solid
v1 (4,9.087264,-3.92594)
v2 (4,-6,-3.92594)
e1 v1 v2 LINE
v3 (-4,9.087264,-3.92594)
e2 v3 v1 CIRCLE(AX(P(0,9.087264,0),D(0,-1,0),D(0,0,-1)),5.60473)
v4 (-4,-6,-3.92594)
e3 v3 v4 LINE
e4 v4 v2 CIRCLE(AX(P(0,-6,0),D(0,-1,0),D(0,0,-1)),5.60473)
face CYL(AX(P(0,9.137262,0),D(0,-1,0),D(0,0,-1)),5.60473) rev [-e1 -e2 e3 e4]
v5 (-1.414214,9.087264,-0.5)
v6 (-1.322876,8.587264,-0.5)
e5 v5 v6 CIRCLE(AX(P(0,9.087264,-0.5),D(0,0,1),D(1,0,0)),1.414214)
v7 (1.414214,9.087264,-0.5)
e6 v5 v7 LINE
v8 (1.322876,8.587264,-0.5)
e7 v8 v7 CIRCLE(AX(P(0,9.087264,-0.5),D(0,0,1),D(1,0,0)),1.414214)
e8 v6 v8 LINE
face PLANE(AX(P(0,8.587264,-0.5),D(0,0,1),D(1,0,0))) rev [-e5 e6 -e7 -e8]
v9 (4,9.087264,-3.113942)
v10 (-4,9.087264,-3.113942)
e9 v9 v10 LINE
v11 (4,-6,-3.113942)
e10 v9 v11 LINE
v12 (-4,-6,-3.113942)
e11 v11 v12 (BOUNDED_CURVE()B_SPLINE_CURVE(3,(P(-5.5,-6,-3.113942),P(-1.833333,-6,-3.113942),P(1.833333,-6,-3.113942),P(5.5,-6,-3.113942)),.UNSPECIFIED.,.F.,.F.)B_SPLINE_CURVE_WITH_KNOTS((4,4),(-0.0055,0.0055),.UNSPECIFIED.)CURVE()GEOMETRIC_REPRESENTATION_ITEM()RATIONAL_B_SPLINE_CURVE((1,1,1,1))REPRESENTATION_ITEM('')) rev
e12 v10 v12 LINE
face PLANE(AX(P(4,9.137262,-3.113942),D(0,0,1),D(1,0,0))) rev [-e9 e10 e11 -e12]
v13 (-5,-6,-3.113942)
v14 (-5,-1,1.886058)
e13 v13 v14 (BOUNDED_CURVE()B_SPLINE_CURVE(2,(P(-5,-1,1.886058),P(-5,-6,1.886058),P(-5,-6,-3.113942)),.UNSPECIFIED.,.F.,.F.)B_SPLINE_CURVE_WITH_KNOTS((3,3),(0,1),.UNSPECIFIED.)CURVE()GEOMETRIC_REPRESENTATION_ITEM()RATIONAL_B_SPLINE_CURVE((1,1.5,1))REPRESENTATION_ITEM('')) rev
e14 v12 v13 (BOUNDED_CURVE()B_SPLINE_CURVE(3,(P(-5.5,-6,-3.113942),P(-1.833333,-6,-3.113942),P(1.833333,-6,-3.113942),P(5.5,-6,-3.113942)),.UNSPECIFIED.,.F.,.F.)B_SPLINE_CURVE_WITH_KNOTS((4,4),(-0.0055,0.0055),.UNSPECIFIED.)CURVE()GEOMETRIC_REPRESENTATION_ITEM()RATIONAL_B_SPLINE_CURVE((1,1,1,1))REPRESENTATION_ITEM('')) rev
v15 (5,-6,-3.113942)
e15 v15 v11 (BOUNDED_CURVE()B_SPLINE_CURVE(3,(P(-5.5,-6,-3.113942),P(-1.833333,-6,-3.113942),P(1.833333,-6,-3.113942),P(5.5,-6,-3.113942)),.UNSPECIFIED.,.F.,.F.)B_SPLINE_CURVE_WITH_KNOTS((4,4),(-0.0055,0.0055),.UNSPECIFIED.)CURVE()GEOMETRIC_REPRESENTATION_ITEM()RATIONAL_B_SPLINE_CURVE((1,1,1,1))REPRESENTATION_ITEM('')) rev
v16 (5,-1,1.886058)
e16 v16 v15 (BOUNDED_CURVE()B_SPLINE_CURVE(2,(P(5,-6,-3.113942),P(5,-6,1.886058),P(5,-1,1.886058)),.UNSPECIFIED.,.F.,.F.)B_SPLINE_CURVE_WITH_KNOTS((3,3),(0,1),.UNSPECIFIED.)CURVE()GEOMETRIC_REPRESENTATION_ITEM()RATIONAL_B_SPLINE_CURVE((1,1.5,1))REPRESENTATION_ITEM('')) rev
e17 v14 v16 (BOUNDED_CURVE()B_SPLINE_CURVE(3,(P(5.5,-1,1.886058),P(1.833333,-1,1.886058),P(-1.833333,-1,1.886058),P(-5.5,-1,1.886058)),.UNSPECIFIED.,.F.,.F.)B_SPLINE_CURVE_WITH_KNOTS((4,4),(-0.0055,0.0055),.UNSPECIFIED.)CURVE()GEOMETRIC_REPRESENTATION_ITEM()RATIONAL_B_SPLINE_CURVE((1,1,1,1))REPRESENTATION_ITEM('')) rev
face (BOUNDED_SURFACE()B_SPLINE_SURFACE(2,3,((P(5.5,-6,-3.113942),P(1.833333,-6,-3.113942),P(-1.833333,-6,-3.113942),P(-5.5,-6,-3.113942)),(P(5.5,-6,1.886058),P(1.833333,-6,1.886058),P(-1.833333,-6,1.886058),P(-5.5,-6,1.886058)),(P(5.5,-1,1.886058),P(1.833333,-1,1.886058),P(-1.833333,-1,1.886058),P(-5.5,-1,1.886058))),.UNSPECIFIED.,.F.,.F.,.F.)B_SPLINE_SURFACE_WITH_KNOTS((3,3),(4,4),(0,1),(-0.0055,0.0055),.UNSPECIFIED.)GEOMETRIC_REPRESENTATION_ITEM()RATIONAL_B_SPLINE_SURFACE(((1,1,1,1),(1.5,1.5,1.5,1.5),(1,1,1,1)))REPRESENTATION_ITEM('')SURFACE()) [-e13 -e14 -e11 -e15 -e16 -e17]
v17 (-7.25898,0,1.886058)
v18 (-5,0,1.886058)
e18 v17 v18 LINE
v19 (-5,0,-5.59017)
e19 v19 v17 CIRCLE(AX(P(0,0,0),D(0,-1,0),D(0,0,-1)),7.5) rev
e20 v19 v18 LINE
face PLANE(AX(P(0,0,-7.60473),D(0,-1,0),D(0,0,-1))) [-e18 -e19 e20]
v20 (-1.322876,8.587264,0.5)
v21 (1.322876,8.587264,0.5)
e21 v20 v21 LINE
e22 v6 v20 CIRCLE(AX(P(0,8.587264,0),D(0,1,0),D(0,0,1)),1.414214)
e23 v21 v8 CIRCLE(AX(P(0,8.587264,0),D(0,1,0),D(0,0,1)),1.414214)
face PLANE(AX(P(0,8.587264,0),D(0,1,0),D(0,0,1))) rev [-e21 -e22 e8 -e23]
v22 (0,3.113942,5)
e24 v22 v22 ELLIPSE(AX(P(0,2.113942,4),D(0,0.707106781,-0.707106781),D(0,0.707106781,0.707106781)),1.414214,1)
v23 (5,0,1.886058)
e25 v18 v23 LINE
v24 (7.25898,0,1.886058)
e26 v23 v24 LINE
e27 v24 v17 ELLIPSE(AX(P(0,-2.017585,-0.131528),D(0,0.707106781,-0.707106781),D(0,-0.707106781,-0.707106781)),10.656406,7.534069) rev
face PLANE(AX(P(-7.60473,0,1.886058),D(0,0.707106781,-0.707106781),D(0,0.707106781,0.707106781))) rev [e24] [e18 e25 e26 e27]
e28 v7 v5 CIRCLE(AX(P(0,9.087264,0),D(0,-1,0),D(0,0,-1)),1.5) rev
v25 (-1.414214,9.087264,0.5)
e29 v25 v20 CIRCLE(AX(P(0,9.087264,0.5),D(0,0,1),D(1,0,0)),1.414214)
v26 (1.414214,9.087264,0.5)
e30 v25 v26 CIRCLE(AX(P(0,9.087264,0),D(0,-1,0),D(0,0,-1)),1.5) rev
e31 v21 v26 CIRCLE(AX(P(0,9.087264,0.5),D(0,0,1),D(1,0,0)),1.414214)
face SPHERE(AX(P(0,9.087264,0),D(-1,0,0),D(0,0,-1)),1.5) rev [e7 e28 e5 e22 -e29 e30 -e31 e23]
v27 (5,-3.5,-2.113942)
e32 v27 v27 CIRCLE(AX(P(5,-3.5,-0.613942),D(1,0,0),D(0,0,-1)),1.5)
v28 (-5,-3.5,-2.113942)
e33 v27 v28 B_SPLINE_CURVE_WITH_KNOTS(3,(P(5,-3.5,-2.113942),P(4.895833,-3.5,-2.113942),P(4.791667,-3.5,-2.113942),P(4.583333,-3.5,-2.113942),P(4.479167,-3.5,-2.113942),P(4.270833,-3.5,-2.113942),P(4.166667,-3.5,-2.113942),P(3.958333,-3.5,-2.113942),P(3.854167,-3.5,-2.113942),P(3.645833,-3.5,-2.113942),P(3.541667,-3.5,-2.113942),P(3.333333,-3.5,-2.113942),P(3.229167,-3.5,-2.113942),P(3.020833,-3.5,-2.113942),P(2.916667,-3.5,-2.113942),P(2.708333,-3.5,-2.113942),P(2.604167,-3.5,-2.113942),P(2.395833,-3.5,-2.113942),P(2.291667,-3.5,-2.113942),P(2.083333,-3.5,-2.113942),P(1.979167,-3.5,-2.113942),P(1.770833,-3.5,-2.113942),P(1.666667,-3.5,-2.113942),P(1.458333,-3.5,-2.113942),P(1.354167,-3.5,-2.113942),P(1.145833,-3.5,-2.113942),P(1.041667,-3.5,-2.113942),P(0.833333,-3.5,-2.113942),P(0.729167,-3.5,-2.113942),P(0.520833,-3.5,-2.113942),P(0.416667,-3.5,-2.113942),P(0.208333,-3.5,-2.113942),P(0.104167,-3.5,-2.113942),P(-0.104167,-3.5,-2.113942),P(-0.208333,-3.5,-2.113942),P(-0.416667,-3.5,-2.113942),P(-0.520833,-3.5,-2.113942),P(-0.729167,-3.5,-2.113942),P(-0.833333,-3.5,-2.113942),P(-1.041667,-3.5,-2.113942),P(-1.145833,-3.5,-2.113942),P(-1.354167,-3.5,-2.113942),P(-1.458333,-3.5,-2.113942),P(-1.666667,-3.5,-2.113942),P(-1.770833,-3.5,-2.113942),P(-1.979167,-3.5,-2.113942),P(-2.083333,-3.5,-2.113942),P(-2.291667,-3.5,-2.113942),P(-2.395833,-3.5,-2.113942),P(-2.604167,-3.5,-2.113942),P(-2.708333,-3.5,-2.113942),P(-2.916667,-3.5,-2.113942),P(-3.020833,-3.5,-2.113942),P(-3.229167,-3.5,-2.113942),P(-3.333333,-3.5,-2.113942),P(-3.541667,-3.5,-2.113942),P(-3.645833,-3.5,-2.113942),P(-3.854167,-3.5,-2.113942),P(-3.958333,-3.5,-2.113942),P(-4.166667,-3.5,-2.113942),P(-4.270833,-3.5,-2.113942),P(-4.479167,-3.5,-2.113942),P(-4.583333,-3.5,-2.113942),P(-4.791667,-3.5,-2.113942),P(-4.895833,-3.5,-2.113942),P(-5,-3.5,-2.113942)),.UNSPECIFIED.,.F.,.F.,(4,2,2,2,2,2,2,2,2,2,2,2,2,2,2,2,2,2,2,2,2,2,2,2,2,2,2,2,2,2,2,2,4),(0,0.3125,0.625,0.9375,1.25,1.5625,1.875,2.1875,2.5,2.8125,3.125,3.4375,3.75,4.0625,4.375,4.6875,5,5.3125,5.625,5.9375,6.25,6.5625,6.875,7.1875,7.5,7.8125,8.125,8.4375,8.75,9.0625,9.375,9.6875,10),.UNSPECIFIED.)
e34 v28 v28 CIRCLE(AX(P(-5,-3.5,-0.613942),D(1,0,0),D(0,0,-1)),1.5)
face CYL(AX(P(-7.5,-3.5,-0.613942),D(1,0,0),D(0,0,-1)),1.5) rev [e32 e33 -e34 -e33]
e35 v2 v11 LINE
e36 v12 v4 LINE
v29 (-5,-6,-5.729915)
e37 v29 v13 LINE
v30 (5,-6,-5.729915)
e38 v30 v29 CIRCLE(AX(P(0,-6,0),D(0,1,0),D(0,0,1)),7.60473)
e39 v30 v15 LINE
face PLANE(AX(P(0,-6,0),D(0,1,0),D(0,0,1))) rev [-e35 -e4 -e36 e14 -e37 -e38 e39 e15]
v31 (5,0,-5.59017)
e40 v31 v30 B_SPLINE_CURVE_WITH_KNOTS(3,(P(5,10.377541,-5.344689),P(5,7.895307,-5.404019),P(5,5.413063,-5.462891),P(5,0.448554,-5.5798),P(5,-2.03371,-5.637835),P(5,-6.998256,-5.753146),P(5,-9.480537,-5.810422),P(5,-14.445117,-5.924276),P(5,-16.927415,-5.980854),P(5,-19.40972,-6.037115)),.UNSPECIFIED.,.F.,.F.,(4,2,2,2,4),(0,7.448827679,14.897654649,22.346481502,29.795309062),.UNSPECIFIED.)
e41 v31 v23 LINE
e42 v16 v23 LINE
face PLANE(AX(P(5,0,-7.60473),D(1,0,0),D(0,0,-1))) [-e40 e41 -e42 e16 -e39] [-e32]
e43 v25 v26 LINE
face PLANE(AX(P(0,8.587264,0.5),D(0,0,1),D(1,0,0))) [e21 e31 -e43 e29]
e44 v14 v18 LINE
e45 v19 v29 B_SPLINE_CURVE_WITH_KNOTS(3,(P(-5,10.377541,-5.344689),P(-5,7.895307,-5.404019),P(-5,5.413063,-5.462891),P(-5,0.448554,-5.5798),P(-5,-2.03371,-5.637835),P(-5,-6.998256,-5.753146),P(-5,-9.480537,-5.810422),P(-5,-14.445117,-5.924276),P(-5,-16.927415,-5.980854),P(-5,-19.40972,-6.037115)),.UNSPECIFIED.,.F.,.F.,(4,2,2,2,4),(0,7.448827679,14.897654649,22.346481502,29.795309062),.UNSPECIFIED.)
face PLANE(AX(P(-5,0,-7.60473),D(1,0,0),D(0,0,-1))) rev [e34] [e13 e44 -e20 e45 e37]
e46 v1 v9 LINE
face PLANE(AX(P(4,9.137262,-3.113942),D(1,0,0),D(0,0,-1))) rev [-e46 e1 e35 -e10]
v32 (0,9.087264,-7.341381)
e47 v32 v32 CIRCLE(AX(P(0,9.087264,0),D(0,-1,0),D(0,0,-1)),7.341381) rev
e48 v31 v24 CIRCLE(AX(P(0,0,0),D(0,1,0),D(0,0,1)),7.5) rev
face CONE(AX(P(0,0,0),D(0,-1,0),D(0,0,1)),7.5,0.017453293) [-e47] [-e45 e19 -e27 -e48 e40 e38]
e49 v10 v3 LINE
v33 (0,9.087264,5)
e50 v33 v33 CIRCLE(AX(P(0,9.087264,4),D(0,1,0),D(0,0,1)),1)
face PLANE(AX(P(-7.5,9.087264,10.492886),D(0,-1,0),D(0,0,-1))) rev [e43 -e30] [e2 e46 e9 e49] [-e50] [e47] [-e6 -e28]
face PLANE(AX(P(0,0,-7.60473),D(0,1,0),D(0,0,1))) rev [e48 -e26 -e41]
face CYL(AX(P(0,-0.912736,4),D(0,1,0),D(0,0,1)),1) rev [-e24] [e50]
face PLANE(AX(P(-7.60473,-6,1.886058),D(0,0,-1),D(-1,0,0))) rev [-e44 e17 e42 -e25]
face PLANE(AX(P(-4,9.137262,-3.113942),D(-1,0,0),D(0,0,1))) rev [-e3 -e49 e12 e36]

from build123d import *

# Parameters (mm, degrees)
SKETCH1_R                     = 7.5
BOSS_EXTRUDE1_DEPTH           = 19
BOSS_EXTRUDE1_TAPER           = 1
BOSS_EXTRUDE1_OTHER_WAY_DEPTH = 6
BOSS_EXTRUDE1_OTHER_WAY_TAPER = -1
CUT_EXTRUDE1_DEPTH            = 22.832632654
CUT_EXTRUDE1_DEPTH_BACK       = 22.832632654
CUT_EXTRUDE2_START            = -9.490788257
CUT_EXTRUDE2_OUTLINE_W        = 6.502745185
CUT_EXTRUDE2_OUTLINE_H        = 6
CUT_EXTRUDE2_DEPTH            = 9.490788257
SKETCH5_R                     = 1.5
CUT_EXTRUDE3_DEPTH            = 24.980865958
FILLET1_SIZE                  = 5
CUT_EXTRUDE4_DEPTH            = 22.796374265
CUT_EXTRUDE4_DEPTH_BACK       = 22.796374265
SKETCH6_W                     = 18.67842866
SKETCH6_H                     = 10.912736301
CUT_EXTRUDE5_DEPTH            = 19.48533084
SKETCH8_R                     = 1
CUT_EXTRUDE6_DEPTH            = 10
BOSS_EXTRUDE2_DEPTH           = 0.5


with BuildPart() as part:
    # Sketch1 → Boss-Extrude1 (new body)
    with BuildSketch(Plane(origin=(0, 0, 0), x_dir=(1, 0, 0), z_dir=(0, 1, 0))):
        Circle(SKETCH1_R)
    extrude(amount=BOSS_EXTRUDE1_DEPTH, taper=BOSS_EXTRUDE1_TAPER)

    # Sketch1 → Boss-Extrude1 other way (add)
    with BuildSketch(Plane(origin=(0, 0, 0), x_dir=(1, 0, 0), z_dir=(0, 1, 0))):
        Circle(SKETCH1_R)
    extrude(amount=-BOSS_EXTRUDE1_OTHER_WAY_DEPTH, taper=BOSS_EXTRUDE1_OTHER_WAY_TAPER)

    # Sketch3 → Cut-Extrude1 (cut, two sides: drawn at the far end of the back side and taken through both)
    with BuildSketch(Plane(origin=(0, 0, 0), x_dir=(0, 0, -1), z_dir=(1, 0, 0)).offset(-CUT_EXTRUDE1_DEPTH_BACK)):
        Polygon((-1.886057768, -6), (-1.886057768, 0), (-9.929766736, 8.043708969), (-9.929766736, -6), align=None)
    extrude(amount=CUT_EXTRUDE1_DEPTH + CUT_EXTRUDE1_DEPTH_BACK, mode=Mode.SUBTRACT)

    # Cut-Extrude2: read off the stored shape, not the designer's step
    # Cut-Extrude2 outline → Cut-Extrude2 (cut)
    with BuildSketch(Plane.XY.offset(1.886057768).offset(CUT_EXTRUDE2_START)):
        with Locations((-8.251372593, -3)):
            Rectangle(CUT_EXTRUDE2_OUTLINE_W, CUT_EXTRUDE2_OUTLINE_H)
        with Locations((8.251372593, -3)):
            Rectangle(CUT_EXTRUDE2_OUTLINE_W, CUT_EXTRUDE2_OUTLINE_H)
    extrude(amount=CUT_EXTRUDE2_DEPTH, mode=Mode.SUBTRACT)

    # Sketch5 → Cut-Extrude3 (cut, through all)
    with BuildSketch(Plane(origin=(5, 0, 0), x_dir=(0, 0, -1), z_dir=(1, 0, 0))):
        with Locations((0.613942232, -3.5)):
            Circle(SKETCH5_R)
    extrude(amount=-CUT_EXTRUDE3_DEPTH, mode=Mode.SUBTRACT)

    # Fillet1
    # a fillet whose section is not a circle: 5 mm, written as the material it takes off along each edge
    with BuildSketch(Plane(origin=(17.5, -6, 1.886057768), x_dir=(0, 0, -1), z_dir=(-1, 0, 0))) as fillet1_piece_1:
        with BuildLine():
            Bezier((FILLET1_SIZE, 0), (0, 0), (0, -FILLET1_SIZE), weights=[1, 1.5, 1])
            Line((0, -FILLET1_SIZE), (0, 0))
            Line((0, 0), (FILLET1_SIZE, 0))
        make_face()
    extrude(amount=35, mode=Mode.SUBTRACT)

    # Fillet2
    # a fillet whose section is not a circle: 10, 5 mm, written as the material it takes off along each edge
    with BuildSketch(Plane(origin=(0, 19, 0), x_dir=(1, 0, 0), z_dir=(0, 0, -1))) as fillet2_piece_1:
        with BuildLine():
            Bezier((7.341381251, 9.912737968), (7.168353766, 0), (2.342142775, 0), weights=[1, 0.818181818, 1])
            Line((2.342142775, 0), (7.168353766, 0))
            Line((7.168353766, 0), (7.341381251, 9.912737968))
        make_face()
    revolve(axis=Axis((0, 19, 0), (0, -1, 0)), mode=Mode.SUBTRACT)

    # Sketch6 → Cut-Extrude4 (cut, two sides: drawn at the far end of the back side and taken through both)
    with BuildSketch(Plane(origin=(0, 0, 0), x_dir=(0, 0, -1), z_dir=(1, 0, 0)).offset(-CUT_EXTRUDE4_DEPTH_BACK)):
        with Locations((-1.153671222, 14.54363185)):
            Rectangle(SKETCH6_W, SKETCH6_H)
    extrude(amount=CUT_EXTRUDE4_DEPTH + CUT_EXTRUDE4_DEPTH_BACK, mode=Mode.SUBTRACT)

    # Sketch7 → Cut-Extrude5 (cut, through all)
    with BuildSketch(Plane.XZ.offset(6)):
        with BuildLine():
            Line((4, -3.113942232), (4, -3.925939727))
            ThreePointArc((4, -3.925939727), (0, -5.60473039), (-4, -3.925939727))
            Line((-4, -3.925939727), (-4, -3.113942232))
            Line((-4, -3.113942232), (4, -3.113942232))
        make_face()
    extrude(amount=-CUT_EXTRUDE5_DEPTH, mode=Mode.SUBTRACT)

    # Sketch8 → Cut-Extrude6 (cut)
    with BuildSketch(Plane(origin=(0, 9.087263699, 0), x_dir=(1, 0, 0), z_dir=(0, 1, 0))):
        with Locations(Location((0, -4, 0), (0, 0, 270))):
            Circle(SKETCH8_R)
    extrude(amount=-CUT_EXTRUDE6_DEPTH, mode=Mode.SUBTRACT)

    # Sketch9 → Cut-Revolve1 (revolve, cut)
    with BuildSketch(Plane(origin=(0, 9.087263699, 0), x_dir=(1, 0, 0), z_dir=(0, 1, 0))):
        with BuildLine():
            Line((-1.5, 0), (1.5, 0))
            ThreePointArc((1.5, 0), (0, 1.5), (-1.5, 0))
        make_face()
    revolve(axis=Axis((-1.5, 9.087263699, 0), (1, 0, 0)), mode=Mode.SUBTRACT)

    # Sketch10 → Boss-Extrude2 (add)
    with BuildSketch(Plane(origin=(0, 9.087263699, 0), x_dir=(1, 0, 0), z_dir=(0, 1, 0))):
        with BuildLine():
            ThreePointArc((-1.414213562, 0.5), (-1.5, 0), (-1.414213562, -0.5))
            Line((-1.414213562, -0.5), (1.414213562, -0.5))
            ThreePointArc((1.414213562, -0.5), (1.478397839, -0.253652968), (1.5, 0))
            ThreePointArc((1.5, 0), (1.478397839, 0.253652968), (1.414213562, 0.5))
            Line((1.414213562, 0.5), (-1.414213562, 0.5))
        make_face()
    extrude(amount=-BOSS_EXTRUDE2_DEPTH)


solid = part.part
